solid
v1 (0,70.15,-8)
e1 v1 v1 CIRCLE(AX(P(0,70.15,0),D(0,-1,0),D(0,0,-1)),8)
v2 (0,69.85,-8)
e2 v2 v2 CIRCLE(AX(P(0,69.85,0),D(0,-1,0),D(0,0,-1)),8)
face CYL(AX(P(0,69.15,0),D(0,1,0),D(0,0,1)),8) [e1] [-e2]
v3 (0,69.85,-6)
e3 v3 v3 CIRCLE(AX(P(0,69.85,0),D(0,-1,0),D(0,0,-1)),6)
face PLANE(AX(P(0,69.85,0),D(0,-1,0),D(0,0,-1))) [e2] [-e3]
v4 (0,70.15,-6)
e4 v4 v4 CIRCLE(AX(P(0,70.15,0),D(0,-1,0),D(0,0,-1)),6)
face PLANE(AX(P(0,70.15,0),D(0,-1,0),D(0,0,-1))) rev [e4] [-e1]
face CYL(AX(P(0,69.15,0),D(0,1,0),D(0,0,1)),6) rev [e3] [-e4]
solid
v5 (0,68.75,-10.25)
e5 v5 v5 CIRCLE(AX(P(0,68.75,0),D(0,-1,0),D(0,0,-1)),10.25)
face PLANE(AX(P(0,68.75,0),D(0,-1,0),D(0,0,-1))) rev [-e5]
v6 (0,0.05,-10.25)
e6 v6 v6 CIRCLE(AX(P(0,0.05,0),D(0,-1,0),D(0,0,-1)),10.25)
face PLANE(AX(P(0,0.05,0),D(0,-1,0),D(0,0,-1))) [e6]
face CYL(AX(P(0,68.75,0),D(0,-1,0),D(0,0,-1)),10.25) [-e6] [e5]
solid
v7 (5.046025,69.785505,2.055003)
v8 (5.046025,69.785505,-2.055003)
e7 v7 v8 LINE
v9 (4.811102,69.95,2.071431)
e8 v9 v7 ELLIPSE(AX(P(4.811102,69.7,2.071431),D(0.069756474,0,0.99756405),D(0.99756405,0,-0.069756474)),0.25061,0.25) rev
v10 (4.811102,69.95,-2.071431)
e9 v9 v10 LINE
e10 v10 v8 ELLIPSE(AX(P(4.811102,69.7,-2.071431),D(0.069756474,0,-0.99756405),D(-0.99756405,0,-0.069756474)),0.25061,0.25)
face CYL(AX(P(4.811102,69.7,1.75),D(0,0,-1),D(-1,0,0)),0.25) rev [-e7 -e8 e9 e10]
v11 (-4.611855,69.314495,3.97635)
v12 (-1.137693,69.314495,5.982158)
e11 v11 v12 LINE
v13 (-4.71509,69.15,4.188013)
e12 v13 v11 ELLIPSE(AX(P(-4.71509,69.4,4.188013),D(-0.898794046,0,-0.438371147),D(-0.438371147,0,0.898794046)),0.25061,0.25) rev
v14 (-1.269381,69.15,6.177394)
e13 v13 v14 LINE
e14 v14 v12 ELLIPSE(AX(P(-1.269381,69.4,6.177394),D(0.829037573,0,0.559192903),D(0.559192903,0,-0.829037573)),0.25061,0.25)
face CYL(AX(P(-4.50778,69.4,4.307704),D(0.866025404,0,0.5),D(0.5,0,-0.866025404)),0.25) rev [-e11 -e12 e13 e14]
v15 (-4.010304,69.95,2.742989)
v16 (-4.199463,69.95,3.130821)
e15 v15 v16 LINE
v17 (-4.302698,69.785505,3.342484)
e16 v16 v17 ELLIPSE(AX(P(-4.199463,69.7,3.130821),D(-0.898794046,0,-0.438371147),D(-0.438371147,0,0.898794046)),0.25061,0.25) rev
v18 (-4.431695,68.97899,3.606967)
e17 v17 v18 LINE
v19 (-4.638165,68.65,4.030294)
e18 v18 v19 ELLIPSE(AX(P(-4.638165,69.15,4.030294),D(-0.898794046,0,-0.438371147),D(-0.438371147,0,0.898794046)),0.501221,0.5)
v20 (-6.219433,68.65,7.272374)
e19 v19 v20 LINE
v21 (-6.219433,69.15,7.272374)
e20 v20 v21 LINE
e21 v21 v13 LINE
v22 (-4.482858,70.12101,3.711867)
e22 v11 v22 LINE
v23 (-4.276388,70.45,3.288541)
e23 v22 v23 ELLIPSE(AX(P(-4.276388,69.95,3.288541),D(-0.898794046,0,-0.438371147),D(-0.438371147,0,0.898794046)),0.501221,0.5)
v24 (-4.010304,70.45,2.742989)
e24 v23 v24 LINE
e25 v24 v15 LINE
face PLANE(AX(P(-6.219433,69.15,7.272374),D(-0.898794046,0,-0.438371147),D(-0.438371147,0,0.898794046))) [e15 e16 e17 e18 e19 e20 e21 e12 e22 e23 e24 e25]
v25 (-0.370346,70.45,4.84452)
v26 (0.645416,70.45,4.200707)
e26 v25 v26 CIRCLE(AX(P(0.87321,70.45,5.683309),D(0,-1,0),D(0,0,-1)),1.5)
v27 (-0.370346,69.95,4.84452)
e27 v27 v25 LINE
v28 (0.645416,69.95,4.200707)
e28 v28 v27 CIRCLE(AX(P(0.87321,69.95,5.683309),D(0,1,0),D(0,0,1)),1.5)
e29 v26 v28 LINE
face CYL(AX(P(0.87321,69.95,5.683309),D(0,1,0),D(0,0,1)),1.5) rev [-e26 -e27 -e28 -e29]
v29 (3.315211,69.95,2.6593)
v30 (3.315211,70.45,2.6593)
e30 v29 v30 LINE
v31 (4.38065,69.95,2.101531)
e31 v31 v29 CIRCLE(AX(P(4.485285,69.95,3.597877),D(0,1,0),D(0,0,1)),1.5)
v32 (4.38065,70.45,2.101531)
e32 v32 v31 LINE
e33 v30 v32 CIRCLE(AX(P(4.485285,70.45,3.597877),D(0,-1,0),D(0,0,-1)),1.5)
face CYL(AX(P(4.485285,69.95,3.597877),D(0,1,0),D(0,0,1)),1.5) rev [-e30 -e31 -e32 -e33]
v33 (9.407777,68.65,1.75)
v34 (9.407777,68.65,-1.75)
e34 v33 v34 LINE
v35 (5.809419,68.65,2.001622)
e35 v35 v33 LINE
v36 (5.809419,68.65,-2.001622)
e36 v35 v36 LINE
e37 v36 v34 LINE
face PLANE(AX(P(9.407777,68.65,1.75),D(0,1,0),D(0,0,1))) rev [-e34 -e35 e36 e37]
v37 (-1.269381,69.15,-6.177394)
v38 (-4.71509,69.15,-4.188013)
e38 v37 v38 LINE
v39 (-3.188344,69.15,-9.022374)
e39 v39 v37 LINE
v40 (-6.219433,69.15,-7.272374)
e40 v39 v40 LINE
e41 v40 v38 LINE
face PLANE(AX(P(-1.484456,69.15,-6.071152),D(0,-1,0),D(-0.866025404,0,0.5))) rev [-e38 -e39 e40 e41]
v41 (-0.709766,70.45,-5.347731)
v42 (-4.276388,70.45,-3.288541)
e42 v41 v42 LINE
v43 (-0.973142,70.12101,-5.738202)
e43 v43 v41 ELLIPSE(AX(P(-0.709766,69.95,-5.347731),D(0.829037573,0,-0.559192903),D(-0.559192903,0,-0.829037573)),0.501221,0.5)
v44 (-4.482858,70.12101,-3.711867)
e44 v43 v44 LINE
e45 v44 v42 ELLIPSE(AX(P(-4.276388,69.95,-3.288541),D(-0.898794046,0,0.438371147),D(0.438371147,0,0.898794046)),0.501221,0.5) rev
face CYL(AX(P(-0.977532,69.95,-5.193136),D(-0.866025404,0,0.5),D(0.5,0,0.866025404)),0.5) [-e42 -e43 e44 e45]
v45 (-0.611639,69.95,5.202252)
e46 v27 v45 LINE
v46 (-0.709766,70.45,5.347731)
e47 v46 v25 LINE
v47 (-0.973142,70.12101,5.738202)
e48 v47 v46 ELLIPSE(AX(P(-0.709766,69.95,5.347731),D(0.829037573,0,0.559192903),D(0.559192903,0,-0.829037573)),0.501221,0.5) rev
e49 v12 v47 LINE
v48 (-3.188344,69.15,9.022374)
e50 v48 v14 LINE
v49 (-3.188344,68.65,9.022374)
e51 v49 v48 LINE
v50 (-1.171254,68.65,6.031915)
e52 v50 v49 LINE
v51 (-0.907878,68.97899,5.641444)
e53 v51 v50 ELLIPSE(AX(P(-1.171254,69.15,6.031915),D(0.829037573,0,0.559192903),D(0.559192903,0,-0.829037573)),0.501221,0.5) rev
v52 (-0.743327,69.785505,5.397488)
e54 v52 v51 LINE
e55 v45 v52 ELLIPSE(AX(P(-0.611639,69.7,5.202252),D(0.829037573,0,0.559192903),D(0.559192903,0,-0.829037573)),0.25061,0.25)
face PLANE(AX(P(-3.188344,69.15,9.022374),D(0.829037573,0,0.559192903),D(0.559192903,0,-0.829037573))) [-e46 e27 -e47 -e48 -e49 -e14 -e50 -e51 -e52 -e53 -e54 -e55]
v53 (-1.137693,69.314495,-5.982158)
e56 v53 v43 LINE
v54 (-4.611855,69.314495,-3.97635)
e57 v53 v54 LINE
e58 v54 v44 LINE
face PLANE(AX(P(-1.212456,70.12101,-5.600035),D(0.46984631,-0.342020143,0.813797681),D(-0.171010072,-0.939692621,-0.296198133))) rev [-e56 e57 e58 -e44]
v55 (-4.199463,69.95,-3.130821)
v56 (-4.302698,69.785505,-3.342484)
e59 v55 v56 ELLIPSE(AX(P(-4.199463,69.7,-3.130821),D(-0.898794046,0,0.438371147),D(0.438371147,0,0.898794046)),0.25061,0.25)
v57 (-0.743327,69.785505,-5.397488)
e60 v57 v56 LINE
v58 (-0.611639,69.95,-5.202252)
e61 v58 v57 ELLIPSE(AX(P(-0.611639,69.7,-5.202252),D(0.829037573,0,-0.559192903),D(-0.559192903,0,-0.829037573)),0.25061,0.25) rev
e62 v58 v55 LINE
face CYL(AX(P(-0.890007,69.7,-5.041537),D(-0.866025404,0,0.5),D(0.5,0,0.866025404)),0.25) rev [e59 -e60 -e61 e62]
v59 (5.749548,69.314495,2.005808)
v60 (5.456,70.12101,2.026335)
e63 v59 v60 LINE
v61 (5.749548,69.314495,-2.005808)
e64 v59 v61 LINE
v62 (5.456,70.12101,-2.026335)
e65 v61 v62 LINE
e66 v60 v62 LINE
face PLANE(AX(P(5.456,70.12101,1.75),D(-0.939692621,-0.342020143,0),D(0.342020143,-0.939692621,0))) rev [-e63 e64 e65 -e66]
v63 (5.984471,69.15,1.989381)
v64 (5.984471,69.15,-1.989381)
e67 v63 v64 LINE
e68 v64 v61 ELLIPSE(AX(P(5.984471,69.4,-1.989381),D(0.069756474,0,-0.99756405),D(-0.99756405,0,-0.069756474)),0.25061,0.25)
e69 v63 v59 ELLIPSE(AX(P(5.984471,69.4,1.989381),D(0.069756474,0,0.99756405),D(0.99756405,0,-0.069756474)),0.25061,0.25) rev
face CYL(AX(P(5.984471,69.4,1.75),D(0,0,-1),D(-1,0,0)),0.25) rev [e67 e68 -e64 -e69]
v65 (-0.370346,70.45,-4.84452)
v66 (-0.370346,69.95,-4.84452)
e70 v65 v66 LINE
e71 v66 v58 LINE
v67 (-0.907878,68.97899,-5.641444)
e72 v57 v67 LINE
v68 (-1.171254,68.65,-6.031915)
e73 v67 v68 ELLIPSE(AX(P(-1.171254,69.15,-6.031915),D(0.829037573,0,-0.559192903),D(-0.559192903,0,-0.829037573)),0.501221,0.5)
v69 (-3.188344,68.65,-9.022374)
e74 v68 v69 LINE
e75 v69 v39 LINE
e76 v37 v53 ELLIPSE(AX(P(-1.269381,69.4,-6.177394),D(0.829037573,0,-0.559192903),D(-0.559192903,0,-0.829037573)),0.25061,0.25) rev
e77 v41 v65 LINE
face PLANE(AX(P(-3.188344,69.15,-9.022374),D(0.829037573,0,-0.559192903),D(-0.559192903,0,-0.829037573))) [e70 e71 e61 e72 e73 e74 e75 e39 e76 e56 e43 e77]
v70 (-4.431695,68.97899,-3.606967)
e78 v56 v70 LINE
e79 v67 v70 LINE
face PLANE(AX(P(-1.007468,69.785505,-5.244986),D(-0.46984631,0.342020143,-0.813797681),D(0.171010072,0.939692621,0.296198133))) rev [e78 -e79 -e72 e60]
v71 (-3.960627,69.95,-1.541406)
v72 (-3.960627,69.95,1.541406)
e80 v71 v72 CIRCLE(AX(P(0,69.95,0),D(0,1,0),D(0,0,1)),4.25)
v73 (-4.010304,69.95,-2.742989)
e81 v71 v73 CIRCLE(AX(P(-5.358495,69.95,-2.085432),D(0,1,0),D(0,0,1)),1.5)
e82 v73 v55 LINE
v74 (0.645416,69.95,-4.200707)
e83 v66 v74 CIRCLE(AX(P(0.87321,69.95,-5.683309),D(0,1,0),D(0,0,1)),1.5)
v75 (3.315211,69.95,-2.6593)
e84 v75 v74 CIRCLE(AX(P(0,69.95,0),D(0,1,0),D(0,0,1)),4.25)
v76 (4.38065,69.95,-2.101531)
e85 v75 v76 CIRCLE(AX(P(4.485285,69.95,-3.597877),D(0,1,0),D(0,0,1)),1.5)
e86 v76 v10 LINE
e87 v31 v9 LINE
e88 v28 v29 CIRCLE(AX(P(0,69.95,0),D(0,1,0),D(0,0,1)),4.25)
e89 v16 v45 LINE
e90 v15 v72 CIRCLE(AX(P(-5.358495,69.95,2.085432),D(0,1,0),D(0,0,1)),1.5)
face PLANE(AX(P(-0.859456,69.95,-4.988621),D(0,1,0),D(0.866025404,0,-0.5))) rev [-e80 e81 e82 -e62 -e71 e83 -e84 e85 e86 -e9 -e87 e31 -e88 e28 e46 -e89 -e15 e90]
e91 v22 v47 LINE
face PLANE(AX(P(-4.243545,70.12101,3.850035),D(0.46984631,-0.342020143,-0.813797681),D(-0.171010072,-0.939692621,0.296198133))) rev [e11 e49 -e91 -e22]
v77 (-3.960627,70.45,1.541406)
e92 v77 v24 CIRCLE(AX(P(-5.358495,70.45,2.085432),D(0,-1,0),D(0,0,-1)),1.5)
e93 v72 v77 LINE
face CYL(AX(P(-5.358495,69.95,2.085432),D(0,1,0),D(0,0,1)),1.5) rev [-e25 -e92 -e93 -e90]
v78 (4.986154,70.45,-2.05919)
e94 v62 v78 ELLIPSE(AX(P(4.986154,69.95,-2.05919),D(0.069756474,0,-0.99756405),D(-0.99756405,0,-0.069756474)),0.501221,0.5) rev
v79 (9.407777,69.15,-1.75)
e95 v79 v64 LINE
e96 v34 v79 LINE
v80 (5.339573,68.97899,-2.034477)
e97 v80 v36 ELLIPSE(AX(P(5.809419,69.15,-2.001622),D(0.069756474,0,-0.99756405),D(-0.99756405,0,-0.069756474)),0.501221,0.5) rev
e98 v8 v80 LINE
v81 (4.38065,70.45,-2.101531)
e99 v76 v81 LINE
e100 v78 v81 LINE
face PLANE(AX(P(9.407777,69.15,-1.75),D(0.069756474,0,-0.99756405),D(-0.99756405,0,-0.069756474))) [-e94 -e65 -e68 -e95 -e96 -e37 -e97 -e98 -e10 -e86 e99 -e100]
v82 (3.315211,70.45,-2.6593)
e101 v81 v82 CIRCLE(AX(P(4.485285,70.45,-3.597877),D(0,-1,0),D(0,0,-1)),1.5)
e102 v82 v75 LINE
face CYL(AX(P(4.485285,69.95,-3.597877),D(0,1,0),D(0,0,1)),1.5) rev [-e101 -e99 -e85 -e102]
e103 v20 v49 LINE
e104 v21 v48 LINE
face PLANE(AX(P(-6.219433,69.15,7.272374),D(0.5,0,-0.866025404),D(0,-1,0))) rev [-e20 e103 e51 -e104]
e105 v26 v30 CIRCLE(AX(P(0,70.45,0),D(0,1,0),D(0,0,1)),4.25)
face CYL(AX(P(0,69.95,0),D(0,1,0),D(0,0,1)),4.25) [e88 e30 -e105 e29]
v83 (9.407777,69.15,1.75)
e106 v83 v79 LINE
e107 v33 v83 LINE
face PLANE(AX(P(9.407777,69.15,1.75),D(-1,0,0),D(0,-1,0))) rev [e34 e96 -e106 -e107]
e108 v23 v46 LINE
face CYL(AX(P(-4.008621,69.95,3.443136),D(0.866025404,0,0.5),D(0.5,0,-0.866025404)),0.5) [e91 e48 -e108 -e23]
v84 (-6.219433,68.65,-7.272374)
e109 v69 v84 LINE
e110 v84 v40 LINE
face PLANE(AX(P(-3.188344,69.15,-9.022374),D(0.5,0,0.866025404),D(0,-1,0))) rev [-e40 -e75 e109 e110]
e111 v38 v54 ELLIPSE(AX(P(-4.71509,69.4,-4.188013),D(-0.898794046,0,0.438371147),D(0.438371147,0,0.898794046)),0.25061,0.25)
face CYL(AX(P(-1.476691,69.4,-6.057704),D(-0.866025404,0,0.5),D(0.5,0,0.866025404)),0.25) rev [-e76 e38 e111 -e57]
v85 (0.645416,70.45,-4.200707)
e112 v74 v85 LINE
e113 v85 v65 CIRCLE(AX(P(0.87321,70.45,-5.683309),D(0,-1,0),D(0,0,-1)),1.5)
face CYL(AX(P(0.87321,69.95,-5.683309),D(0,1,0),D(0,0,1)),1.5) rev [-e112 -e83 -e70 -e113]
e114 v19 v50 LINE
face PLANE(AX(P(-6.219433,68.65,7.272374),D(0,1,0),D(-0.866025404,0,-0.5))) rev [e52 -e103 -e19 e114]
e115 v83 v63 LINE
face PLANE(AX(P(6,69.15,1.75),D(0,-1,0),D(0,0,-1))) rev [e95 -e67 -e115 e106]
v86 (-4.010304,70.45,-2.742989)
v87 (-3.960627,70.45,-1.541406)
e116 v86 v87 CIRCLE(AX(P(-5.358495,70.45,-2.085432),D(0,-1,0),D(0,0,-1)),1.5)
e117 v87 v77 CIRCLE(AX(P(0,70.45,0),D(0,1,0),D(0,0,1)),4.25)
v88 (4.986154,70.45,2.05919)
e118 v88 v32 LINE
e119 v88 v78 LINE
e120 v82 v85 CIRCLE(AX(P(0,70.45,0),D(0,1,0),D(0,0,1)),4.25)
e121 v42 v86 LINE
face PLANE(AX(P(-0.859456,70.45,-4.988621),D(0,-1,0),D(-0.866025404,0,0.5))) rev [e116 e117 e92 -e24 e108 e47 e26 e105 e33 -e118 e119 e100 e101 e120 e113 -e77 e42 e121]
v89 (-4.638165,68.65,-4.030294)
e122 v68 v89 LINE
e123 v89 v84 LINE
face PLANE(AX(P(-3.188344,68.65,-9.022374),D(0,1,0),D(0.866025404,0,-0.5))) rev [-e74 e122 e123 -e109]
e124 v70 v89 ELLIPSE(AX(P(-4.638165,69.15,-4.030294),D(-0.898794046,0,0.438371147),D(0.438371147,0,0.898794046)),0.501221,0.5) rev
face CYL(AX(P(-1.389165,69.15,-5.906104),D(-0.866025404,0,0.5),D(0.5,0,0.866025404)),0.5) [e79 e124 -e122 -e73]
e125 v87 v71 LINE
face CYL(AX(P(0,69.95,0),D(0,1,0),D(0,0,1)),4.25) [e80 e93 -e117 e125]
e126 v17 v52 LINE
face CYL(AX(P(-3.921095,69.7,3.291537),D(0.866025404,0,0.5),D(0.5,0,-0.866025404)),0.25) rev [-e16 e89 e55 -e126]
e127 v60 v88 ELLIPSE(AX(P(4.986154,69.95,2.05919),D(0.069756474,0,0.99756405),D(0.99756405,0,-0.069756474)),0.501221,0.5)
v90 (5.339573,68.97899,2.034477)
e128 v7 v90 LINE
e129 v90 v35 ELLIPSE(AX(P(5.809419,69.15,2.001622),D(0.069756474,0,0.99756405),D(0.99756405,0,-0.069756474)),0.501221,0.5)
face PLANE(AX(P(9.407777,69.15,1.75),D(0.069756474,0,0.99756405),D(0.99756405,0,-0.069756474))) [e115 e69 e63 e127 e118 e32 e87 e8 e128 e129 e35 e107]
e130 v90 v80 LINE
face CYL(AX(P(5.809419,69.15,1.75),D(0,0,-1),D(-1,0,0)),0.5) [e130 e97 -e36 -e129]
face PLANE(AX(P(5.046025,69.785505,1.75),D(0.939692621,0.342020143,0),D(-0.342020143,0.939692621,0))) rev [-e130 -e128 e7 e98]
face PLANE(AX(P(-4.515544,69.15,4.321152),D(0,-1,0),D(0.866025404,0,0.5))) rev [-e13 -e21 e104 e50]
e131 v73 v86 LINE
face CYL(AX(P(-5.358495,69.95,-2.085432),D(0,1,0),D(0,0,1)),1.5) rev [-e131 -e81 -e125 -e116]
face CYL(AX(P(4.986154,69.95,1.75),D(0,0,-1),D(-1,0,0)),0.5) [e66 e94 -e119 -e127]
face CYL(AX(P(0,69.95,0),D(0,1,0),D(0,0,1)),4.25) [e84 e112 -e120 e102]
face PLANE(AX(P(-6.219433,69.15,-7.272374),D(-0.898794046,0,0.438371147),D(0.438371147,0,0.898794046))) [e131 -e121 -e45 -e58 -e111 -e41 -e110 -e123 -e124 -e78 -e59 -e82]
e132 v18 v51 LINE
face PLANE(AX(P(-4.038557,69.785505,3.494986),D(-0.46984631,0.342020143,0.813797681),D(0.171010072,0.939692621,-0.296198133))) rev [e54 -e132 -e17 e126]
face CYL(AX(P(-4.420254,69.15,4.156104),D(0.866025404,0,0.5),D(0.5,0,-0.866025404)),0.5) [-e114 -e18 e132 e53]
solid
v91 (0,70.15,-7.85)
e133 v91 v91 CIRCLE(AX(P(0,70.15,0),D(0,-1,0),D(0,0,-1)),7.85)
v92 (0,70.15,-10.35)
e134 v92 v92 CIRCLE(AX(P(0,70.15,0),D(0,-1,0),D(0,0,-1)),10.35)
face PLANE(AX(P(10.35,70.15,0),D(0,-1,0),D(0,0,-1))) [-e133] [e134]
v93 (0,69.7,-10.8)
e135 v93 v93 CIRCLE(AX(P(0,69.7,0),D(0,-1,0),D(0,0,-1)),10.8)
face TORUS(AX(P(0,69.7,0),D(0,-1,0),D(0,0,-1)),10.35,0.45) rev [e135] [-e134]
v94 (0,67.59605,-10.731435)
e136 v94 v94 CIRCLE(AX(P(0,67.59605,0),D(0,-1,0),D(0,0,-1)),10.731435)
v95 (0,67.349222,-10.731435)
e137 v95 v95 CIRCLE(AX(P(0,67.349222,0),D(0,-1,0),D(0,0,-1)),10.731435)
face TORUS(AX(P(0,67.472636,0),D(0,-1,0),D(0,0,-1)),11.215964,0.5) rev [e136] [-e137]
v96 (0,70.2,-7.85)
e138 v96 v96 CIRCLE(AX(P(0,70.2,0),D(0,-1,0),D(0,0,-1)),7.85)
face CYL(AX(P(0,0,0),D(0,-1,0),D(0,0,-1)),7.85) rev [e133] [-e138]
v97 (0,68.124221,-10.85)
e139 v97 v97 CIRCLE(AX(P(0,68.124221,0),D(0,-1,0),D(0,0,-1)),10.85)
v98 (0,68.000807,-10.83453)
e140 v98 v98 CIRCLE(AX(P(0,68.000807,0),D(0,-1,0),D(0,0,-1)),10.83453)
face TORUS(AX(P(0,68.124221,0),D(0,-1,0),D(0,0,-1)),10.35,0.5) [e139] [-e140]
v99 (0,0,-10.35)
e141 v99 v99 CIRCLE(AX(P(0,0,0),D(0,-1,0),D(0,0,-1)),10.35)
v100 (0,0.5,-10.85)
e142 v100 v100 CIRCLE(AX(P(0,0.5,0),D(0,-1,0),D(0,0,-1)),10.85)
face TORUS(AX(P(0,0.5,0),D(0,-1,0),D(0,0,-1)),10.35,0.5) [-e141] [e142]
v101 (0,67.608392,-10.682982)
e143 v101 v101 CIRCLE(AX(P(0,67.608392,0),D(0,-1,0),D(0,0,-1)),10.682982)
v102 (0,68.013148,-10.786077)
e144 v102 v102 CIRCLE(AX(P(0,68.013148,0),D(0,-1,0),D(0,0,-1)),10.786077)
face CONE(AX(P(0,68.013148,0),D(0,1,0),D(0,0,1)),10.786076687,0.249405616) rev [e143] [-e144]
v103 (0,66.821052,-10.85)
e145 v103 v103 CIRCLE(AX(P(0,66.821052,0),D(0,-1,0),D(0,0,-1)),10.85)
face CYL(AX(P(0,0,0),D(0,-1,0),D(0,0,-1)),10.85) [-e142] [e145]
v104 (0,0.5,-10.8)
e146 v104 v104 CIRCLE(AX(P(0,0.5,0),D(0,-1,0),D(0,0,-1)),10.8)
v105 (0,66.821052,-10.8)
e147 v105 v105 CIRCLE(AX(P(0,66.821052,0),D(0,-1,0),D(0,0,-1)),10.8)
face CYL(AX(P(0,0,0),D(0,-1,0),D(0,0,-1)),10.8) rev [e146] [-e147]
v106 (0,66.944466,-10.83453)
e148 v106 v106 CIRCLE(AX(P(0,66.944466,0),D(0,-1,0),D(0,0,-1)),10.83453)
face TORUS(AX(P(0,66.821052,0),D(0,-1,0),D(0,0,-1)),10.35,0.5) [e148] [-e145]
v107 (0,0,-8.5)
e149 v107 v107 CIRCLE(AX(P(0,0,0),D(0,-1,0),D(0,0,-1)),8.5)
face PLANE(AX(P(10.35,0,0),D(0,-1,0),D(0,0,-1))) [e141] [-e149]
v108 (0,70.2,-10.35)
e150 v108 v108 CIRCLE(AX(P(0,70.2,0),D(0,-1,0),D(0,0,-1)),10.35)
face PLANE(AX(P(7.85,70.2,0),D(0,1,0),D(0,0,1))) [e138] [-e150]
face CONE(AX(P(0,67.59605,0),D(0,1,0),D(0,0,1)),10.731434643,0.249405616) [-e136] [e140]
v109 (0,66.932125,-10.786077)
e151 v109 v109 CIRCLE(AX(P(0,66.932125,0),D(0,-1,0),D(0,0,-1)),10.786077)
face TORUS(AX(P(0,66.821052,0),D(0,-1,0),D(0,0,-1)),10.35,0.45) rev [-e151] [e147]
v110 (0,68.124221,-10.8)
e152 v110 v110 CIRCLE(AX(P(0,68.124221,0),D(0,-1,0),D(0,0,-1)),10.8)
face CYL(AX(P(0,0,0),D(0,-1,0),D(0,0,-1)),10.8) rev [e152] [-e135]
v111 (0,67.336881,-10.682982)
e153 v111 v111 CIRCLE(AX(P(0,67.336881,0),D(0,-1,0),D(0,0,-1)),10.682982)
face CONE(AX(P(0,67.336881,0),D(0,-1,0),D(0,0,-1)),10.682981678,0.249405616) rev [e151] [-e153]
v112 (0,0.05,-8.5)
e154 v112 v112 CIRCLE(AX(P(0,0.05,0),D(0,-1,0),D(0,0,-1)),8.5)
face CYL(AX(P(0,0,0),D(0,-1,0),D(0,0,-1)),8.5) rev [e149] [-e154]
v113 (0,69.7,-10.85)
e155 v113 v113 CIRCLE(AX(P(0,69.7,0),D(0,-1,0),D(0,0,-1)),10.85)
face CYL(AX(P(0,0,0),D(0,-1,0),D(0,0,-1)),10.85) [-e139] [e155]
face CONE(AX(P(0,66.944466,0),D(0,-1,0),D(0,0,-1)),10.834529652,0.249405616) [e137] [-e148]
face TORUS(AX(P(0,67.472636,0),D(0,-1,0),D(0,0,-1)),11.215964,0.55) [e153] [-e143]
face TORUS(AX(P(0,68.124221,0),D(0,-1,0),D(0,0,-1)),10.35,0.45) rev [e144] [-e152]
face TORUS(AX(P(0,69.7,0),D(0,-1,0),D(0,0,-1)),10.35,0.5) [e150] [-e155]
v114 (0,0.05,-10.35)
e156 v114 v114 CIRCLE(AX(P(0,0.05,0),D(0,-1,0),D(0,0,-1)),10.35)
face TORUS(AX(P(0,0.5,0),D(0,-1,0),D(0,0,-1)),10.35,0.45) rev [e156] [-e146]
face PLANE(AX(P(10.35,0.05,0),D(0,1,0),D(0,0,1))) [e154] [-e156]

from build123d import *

# Parameters (mm, degrees)
SKETCH3_R           = 8
SKETCH3_R_2         = 6
BOSS_EXTRUDE1_DEPTH = 1
SKETCH5_R           = 4.25
BOSS_EXTRUDE3_DEPTH = 0.5
BOSS_EXTRUDE4_DEPTH = 1.75
BOSS_EXTRUDE5_START = 69.95
BOSS_EXTRUDE5_DEPTH = 0.5
DRAFT1_ANGLE        = 4
CIRPATTERN1_ANGLE   = 120
CIRPATTERN1_2_ANGLE = 120
FILLET1_R           = 1.5
SKETCH10_R          = 8
CUT_EXTRUDE1_DEPTH  = 0.7
SKETCH4_R           = 10.25
BOSS_EXTRUDE2_DEPTH = 68.7


with BuildPart() as part:
    # Sketch1 → Revolve1 (revolve)
    with BuildSketch(Plane.XY, mode=Mode.PRIVATE) as revolve1_sk:
        with BuildLine():
            Line((7.85, 70.2), (10.35, 70.2))
            ThreePointArc((10.35, 70.2), (10.703553391, 70.053553391), (10.85, 69.7))
            Line((10.85, 69.7), (10.85, 68.124220651))
            ThreePointArc((10.85, 68.124220651), (10.846117338, 68.062030724), (10.834529652, 68.000806647))
            Line((10.834529652, 68.000806647), (10.731434643, 67.596050404))
            ThreePointArc((10.731434643, 67.596050404), (10.715964295, 67.4726364), (10.731434643, 67.349222395))
            Line((10.731434643, 67.349222395), (10.834529652, 66.944466152))
            ThreePointArc((10.834529652, 66.944466152), (10.846117338, 66.883242075), (10.85, 66.821052148))
            Line((10.85, 66.821052148), (10.85, 0.5))
            ThreePointArc((10.85, 0.5), (10.703553391, 0.146446609), (10.35, 0))
            Line((10.35, 0), (8.5, 0))
            Line((8.5, 0), (8.5, 0.05))
            Line((8.5, 0.05), (10.35, 0.05))
            ThreePointArc((10.35, 0.05), (10.668198052, 0.181801948), (10.8, 0.5))
            Line((10.8, 0.5), (10.8, 66.821052148))
            ThreePointArc((10.8, 66.821052148), (10.796505604, 66.877023082), (10.786076687, 66.932124752))
            Line((10.786076687, 66.932124752), (10.682981678, 67.336880994))
            ThreePointArc((10.682981678, 67.336880994), (10.665964295, 67.4726364), (10.682981678, 67.608391805))
            Line((10.682981678, 67.608391805), (10.786076687, 68.013148047))
            ThreePointArc((10.786076687, 68.013148047), (10.796505604, 68.068249717), (10.8, 68.124220651))
            Line((10.8, 68.124220651), (10.8, 69.7))
            ThreePointArc((10.8, 69.7), (10.668198052, 70.018198052), (10.35, 70.15))
            Line((10.35, 70.15), (7.85, 70.15))
            Line((7.85, 70.15), (7.85, 70.2))
        make_face()
    revolve(revolve1_sk.sketch.rotate(Axis((0, 0, 0), (0, 1, 0)), 90), axis=Axis((0, 0, 0), (0, 1, 0)))


with BuildPart() as body_2:
    # Sketch3 → Boss-Extrude1 (new body)
    with BuildSketch(Plane(origin=(0, 70.15, 0), x_dir=(-1, 0, 0), z_dir=(0, -1, 0))):
        with Locations(Location((0, 0, 0), (0, 0, 90))):
            Circle(SKETCH3_R)
        with Locations(Location((0, 0, 0), (0, 0, 90))):
            Circle(SKETCH3_R_2, mode=Mode.SUBTRACT)
    extrude(amount=BOSS_EXTRUDE1_DEPTH)

    # Sketch10 → Cut-Extrude1 (cut)
    with BuildSketch(Plane.XZ.offset(-69.15)):
        with Locations(Location((0, 0, 0), (0, 0, 270))):
            Circle(SKETCH10_R)
    extrude(amount=-CUT_EXTRUDE1_DEPTH, mode=Mode.SUBTRACT)


with BuildPart() as body_3:
    # Sketch5 → Boss-Extrude3 (new body)
    with BuildSketch(Plane(origin=(0, 70.45, 0), x_dir=(1, 0, 0), z_dir=(0, 1, 0))):
        with Locations(Location((0, 0, 0), (0, 0, 270))):
            Circle(SKETCH5_R)
    extrude(amount=-BOSS_EXTRUDE3_DEPTH)


with BuildPart() as body_4:
    # Sketch6 → Boss-Extrude4 (new, symmetric)
    with BuildSketch(Plane.XY):
        with BuildLine():
            Line((4.75, 69.95), (4.811101977, 69.95))
            ThreePointArc((4.811101977, 69.95), (4.954496086, 69.904788011), (5.046025132, 69.785505036))
            Line((5.046025132, 69.785505036), (5.339572625, 68.978989928))
            ThreePointArc((5.339572625, 68.978989928), (5.522630717, 68.740423978), (5.809418935, 68.65))
            Line((5.809418935, 68.65), (9.407776856, 68.65))
            Line((9.407776856, 68.65), (9.407776856, 69.15))
            Line((9.407776856, 69.15), (6, 69.15))
            Line((6, 69.15), (5.98447082, 69.15))
            ThreePointArc((5.98447082, 69.15), (5.841076711, 69.195211989), (5.749547664, 69.314494964))
            Line((5.749547664, 69.314494964), (5.456000172, 70.121010072))
            ThreePointArc((5.456000172, 70.121010072), (5.27294208, 70.359576022), (4.986153861, 70.45))
            Line((4.986153861, 70.45), (4.75, 70.45))
            Line((4.75, 70.45), (4.75, 69.95))
        make_face()
    extrude(amount=BOSS_EXTRUDE4_DEPTH, both=True)

    # Boss-Extrude5: read off the stored shape, not the designer's step
    # Boss-Extrude5 outline → Boss-Extrude5 (add)
    with BuildSketch(Plane(origin=(0, 0, 0), x_dir=(1, 0, 0), z_dir=(0, 1, 0)).offset(BOSS_EXTRUDE5_START)):
        with BuildLine():
            Line((3.872983346, -1.75), (4.75, -1.75))
            Line((4.75, -1.75), (4.75, 1.75))
            Line((4.75, 1.75), (3.872983346, 1.75))
            ThreePointArc((3.872983346, 1.75), (4.25, 0), (3.872983346, -1.75))
        make_face()
    extrude(amount=BOSS_EXTRUDE5_DEPTH)

    # Draft1
    draft1_faces = [body_4.faces().sort_by_distance(p)[0] for p in [
        (4.342042661, 70.008201322, 1.75),
        (4.987878993, 69.952463743, -1.75),
    ]]
    draft(draft1_faces, Plane(origin=(9.407776856, 69.15, 1.75), x_dir=(0, 1, 0), z_dir=(1, 0, 0)), DRAFT1_ANGLE)


with BuildPart() as body_5:
    # CirPattern1: read off the stored shape, not the designer's step
    # CirPattern1: copy of body 4
    add(body_4.part.rotate(Axis((0, 0, 0), (0, -1, 0)), CIRPATTERN1_ANGLE))


with BuildPart() as body_6:
    # CirPattern1 2: copy of body 4
    add(body_4.part.rotate(Axis((0, 0, 0), (0, 1, 0)), CIRPATTERN1_2_ANGLE))


with BuildPart() as body_3_1:
    add(body_3.part)

    # Combine1: read off the stored shape, not the designer's step
    # Combine1: union body 4, body 5, body 6
    add(body_4.part)
    add(body_5.part)
    add(body_6.part)

    # Fillet1
    fillet1_edges = [body_3_1.edges().sort_by_distance(p)[0] for p in [
        (-3.695880575, 70.2, -2.098324755),
        (0.030737744, 70.2, -4.249888844),
        (-3.695880575, 70.2, 2.098324755),
        (0.030737744, 70.2, 4.249888844),
        (3.66514283, 70.2, 2.15156409),
        (3.66514283, 70.2, -2.15156409),
    ]]
    fillet(fillet1_edges, radius=FILLET1_R)


with BuildPart() as body_4_2:
    # Sketch4 → Boss-Extrude2 (new body)
    with BuildSketch(Plane(origin=(0, 0.05, 0), x_dir=(-1, 0, 0), z_dir=(0, -1, 0))):
        with Locations(Location((0, 0, 0), (0, 0, 90))):
            Circle(SKETCH4_R)
    extrude(amount=-BOSS_EXTRUDE2_DEPTH)


solid = Compound([part.part, body_2.part, body_3_1.part, body_4_2.part])
